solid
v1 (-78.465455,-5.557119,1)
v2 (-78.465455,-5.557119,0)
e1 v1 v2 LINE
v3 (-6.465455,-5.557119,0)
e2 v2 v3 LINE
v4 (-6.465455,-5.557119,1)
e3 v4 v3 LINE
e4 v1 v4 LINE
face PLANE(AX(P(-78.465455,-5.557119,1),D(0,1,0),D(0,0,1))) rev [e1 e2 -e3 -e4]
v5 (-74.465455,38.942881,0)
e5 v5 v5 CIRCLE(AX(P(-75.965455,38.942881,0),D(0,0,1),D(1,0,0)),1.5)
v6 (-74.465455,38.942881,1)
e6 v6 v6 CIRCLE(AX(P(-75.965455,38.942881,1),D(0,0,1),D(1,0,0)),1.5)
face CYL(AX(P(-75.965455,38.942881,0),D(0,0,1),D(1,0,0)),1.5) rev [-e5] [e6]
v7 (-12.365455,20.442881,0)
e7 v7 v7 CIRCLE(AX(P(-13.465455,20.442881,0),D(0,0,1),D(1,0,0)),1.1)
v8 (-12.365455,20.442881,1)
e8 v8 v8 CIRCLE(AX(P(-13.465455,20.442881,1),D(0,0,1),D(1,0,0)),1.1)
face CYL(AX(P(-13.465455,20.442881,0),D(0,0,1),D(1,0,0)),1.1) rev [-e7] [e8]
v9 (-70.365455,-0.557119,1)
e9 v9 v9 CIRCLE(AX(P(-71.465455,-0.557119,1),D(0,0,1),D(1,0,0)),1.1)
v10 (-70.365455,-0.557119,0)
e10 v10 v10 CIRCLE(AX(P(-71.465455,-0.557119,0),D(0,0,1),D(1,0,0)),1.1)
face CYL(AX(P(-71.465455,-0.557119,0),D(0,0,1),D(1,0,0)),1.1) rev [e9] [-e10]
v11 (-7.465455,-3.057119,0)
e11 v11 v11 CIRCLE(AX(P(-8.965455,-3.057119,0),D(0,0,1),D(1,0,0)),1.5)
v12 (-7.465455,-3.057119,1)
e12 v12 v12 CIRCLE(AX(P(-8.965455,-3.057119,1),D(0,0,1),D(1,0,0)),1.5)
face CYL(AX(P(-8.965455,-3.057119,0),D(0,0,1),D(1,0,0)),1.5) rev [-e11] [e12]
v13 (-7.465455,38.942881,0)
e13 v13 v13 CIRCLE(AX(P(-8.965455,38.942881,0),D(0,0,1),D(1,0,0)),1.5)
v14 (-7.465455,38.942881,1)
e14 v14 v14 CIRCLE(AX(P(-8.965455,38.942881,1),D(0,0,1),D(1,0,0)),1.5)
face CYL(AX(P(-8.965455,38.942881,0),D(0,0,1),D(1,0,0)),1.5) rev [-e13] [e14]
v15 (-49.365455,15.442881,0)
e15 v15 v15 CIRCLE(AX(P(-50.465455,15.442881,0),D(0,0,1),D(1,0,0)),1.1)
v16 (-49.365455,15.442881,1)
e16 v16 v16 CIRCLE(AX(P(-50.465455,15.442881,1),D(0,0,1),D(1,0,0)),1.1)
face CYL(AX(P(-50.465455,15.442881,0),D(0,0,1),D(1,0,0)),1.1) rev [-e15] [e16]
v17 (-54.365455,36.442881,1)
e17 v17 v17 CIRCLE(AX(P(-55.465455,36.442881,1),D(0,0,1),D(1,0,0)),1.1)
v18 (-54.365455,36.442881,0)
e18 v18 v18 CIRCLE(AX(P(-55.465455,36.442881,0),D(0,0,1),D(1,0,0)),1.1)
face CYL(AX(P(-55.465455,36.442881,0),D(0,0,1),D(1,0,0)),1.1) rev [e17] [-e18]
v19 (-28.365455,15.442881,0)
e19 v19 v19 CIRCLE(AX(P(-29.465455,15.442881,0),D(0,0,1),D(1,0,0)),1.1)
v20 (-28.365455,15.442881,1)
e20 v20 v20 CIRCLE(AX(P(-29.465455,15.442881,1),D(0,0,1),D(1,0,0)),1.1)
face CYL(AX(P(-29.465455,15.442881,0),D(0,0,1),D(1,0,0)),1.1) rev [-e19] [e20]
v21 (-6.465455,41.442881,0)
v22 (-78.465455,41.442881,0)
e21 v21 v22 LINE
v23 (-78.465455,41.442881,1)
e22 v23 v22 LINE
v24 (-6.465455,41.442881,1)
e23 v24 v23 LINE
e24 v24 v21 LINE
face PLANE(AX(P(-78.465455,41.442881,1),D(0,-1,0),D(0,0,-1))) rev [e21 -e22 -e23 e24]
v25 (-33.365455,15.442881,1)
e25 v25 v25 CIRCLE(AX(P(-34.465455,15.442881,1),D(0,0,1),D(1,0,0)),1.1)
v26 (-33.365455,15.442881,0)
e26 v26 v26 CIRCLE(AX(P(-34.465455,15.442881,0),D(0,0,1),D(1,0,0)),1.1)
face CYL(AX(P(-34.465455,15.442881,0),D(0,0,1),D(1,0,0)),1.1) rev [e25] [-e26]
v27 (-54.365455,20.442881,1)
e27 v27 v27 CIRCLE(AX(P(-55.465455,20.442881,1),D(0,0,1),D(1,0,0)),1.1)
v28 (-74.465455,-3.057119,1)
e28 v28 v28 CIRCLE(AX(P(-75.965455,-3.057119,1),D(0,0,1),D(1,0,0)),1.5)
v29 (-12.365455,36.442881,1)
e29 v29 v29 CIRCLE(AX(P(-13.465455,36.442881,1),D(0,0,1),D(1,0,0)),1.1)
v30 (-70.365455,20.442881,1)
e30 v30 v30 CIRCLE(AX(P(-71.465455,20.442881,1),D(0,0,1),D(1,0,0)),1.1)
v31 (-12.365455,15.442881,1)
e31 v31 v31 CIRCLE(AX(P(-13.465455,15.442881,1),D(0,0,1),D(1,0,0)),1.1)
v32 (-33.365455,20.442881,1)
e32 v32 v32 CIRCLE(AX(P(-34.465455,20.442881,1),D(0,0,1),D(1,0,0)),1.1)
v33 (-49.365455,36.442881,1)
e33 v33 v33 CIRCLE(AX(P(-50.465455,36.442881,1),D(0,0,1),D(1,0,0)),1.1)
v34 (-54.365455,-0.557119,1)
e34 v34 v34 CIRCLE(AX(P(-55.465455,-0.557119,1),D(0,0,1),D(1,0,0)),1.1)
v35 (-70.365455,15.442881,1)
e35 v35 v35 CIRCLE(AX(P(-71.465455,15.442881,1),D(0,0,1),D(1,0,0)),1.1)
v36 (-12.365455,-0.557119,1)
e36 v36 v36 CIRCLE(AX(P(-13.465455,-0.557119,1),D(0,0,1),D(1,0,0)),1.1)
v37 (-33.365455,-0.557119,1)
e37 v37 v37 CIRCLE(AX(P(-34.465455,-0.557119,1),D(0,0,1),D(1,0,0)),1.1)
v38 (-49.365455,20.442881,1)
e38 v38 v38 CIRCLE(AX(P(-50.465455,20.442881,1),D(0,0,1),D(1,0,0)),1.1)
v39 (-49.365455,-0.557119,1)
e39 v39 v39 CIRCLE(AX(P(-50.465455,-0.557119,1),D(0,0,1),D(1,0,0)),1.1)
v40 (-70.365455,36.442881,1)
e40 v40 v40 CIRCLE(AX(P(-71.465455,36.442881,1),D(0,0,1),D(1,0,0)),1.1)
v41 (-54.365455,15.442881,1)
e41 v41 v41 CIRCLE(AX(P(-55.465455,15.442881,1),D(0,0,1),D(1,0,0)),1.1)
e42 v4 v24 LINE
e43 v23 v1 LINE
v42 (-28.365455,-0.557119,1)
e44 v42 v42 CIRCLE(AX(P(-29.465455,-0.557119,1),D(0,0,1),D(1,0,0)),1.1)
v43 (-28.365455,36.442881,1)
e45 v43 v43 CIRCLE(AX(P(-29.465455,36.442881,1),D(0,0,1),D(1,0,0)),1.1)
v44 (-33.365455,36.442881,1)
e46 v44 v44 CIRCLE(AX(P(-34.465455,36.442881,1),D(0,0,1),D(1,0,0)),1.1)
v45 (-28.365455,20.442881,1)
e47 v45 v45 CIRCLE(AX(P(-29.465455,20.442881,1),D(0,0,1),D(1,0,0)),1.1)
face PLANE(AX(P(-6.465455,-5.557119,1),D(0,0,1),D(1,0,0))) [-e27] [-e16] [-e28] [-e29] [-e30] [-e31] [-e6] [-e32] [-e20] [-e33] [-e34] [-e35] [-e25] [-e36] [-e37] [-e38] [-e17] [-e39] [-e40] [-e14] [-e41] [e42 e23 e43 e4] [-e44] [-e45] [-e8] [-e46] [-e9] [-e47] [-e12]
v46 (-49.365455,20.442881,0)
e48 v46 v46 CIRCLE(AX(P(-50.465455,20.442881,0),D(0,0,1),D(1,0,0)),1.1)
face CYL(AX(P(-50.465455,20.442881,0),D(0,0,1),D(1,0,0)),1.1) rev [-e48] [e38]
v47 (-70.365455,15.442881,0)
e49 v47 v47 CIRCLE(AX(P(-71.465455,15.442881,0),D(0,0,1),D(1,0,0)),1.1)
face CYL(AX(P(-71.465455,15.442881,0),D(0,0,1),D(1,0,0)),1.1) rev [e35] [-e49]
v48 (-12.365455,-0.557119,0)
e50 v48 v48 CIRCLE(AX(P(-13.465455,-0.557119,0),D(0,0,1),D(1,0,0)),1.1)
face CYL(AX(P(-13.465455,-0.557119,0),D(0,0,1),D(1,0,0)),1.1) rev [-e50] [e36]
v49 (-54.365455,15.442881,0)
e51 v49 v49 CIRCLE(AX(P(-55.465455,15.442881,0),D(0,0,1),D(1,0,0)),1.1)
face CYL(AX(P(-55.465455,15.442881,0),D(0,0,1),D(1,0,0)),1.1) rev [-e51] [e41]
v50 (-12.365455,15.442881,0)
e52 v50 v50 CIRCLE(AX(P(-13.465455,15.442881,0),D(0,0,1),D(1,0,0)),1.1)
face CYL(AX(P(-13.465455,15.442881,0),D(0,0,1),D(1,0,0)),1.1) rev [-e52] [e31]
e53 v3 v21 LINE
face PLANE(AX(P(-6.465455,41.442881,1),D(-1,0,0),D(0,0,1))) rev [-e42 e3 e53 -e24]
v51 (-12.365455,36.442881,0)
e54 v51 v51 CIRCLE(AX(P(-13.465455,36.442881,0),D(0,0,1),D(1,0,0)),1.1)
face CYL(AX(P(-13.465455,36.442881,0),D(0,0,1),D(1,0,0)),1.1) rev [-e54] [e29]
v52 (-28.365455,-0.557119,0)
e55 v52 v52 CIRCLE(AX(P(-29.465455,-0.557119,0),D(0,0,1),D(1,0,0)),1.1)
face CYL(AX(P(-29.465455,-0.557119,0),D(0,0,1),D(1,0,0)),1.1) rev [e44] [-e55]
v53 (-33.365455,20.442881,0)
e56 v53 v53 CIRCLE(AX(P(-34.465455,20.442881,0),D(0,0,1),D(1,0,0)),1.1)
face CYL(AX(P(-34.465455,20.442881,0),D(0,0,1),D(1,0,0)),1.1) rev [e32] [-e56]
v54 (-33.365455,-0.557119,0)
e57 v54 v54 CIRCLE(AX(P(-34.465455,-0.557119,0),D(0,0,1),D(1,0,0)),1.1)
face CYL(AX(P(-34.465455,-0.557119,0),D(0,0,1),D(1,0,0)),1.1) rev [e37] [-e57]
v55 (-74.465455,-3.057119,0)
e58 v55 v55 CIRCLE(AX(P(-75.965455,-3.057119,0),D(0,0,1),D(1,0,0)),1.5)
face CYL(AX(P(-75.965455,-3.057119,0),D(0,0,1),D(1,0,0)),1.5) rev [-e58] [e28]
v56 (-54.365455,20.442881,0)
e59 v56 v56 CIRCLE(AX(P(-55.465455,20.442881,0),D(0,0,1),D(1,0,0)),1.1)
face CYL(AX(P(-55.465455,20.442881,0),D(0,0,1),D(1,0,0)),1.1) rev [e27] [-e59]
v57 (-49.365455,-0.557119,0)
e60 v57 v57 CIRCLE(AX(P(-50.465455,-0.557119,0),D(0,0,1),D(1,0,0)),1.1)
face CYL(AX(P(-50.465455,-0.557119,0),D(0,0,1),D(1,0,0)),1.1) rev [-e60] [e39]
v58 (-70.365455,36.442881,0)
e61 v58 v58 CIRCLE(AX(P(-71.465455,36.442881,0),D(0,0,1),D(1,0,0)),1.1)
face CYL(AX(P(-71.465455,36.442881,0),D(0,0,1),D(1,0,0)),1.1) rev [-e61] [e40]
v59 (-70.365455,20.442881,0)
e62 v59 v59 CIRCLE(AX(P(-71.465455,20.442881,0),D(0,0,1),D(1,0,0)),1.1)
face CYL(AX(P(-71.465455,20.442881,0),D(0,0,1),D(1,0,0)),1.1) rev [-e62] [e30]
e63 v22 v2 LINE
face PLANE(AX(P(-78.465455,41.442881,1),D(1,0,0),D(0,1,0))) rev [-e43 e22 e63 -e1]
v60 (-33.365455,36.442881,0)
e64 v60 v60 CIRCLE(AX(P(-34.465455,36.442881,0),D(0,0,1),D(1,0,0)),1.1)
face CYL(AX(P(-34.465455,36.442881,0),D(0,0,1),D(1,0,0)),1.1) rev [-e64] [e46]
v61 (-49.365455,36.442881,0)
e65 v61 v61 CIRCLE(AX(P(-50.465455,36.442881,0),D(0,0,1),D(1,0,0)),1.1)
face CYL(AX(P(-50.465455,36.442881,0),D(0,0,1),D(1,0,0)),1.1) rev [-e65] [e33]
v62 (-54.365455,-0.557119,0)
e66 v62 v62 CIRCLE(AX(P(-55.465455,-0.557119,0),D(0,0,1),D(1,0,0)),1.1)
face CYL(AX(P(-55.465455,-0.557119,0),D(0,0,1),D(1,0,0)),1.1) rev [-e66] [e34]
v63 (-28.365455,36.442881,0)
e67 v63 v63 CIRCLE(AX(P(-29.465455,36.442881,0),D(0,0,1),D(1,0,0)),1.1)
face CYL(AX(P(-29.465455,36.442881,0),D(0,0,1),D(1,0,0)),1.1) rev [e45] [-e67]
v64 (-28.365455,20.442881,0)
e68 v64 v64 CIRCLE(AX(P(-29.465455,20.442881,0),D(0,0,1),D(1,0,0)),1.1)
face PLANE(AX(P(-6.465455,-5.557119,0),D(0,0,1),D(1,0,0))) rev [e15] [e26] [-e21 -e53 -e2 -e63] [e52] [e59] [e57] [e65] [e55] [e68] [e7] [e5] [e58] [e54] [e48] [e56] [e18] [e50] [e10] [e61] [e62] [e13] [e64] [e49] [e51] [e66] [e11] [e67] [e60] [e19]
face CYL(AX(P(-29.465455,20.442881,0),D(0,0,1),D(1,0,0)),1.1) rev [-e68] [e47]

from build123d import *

# Parameters (mm, degrees)
UNIVERSAL_PLATE_OUTLINE_W = 72
UNIVERSAL_PLATE_OUTLINE_H = 47
UNIVERSAL_PLATE_OUTLINE_R = 1.5
UNIVERSAL_PLATE_DEPTH     = 1
SKETCH_2_R                = 1.1
CUT_EXTRUDE_1_DEPTH       = 89.743111904


# Read off the part's stored shape, not the designer's step: universal_plate
with BuildPart() as part:
    # universal_plate outline → universal_plate (new body)
    with BuildSketch(Plane.XY):
        with Locations((-42.465454545, 17.942880613)):
            Rectangle(UNIVERSAL_PLATE_OUTLINE_W, UNIVERSAL_PLATE_OUTLINE_H)
        with Locations((-75.965454545, -3.057119387)):
            Circle(UNIVERSAL_PLATE_OUTLINE_R, mode=Mode.SUBTRACT)
        with Locations((-8.965454545, -3.057119387)):
            Circle(UNIVERSAL_PLATE_OUTLINE_R, mode=Mode.SUBTRACT)
        with Locations((-75.965454545, 38.942880613)):
            Circle(UNIVERSAL_PLATE_OUTLINE_R, mode=Mode.SUBTRACT)
        with Locations((-8.965454545, 38.942880613)):
            Circle(UNIVERSAL_PLATE_OUTLINE_R, mode=Mode.SUBTRACT)
    extrude(amount=UNIVERSAL_PLATE_DEPTH)

    # ｽｹｯﾁ2 → ｶｯﾄ - 押し出し1 (cut, through all)
    with BuildSketch(Plane.XY.offset(1)):
        with Locations((-71.465454545, 36.442880613)):
            Circle(SKETCH_2_R)
        with Locations((-55.465454545, 36.442880613)):
            Circle(SKETCH_2_R)
        with Locations((-71.465454545, 20.442880613)):
            Circle(SKETCH_2_R)
        with Locations((-55.465454545, 20.442880613)):
            Circle(SKETCH_2_R)
        with Locations((-50.465454545, 36.442880613)):
            Circle(SKETCH_2_R)
        with Locations((-34.465454545, 36.442880613)):
            Circle(SKETCH_2_R)
        with Locations((-29.465454545, 36.442880613)):
            Circle(SKETCH_2_R)
        with Locations((-13.465454545, 36.442880613)):
            Circle(SKETCH_2_R)
        with Locations((-34.465454545, 20.442880613)):
            Circle(SKETCH_2_R)
        with Locations((-50.465454545, 20.442880613)):
            Circle(SKETCH_2_R)
        with Locations((-13.465454545, 20.442880613)):
            Circle(SKETCH_2_R)
        with Locations((-29.465454545, 20.442880613)):
            Circle(SKETCH_2_R)
        with Locations((-71.465454545, 15.442880613)):
            Circle(SKETCH_2_R)
        with Locations((-55.465454545, 15.442880613)):
            Circle(SKETCH_2_R)
        with Locations((-50.465454545, 15.442880613)):
            Circle(SKETCH_2_R)
        with Locations((-34.465454545, 15.442880613)):
            Circle(SKETCH_2_R)
        with Locations((-29.465454545, 15.442880613)):
            Circle(SKETCH_2_R)
        with Locations((-13.465454545, 15.442880613)):
            Circle(SKETCH_2_R)
        with Locations((-13.465454545, -0.557119387)):
            Circle(SKETCH_2_R)
        with Locations((-29.465454545, -0.557119387)):
            Circle(SKETCH_2_R)
        with Locations((-34.465454545, -0.557119387)):
            Circle(SKETCH_2_R)
        with Locations((-50.465454545, -0.557119387)):
            Circle(SKETCH_2_R)
        with Locations((-55.465454545, -0.557119387)):
            Circle(SKETCH_2_R)
        with Locations((-71.465454545, -0.557119387)):
            Circle(SKETCH_2_R)
    extrude(amount=-CUT_EXTRUDE_1_DEPTH, mode=Mode.SUBTRACT)


solid = part.part
